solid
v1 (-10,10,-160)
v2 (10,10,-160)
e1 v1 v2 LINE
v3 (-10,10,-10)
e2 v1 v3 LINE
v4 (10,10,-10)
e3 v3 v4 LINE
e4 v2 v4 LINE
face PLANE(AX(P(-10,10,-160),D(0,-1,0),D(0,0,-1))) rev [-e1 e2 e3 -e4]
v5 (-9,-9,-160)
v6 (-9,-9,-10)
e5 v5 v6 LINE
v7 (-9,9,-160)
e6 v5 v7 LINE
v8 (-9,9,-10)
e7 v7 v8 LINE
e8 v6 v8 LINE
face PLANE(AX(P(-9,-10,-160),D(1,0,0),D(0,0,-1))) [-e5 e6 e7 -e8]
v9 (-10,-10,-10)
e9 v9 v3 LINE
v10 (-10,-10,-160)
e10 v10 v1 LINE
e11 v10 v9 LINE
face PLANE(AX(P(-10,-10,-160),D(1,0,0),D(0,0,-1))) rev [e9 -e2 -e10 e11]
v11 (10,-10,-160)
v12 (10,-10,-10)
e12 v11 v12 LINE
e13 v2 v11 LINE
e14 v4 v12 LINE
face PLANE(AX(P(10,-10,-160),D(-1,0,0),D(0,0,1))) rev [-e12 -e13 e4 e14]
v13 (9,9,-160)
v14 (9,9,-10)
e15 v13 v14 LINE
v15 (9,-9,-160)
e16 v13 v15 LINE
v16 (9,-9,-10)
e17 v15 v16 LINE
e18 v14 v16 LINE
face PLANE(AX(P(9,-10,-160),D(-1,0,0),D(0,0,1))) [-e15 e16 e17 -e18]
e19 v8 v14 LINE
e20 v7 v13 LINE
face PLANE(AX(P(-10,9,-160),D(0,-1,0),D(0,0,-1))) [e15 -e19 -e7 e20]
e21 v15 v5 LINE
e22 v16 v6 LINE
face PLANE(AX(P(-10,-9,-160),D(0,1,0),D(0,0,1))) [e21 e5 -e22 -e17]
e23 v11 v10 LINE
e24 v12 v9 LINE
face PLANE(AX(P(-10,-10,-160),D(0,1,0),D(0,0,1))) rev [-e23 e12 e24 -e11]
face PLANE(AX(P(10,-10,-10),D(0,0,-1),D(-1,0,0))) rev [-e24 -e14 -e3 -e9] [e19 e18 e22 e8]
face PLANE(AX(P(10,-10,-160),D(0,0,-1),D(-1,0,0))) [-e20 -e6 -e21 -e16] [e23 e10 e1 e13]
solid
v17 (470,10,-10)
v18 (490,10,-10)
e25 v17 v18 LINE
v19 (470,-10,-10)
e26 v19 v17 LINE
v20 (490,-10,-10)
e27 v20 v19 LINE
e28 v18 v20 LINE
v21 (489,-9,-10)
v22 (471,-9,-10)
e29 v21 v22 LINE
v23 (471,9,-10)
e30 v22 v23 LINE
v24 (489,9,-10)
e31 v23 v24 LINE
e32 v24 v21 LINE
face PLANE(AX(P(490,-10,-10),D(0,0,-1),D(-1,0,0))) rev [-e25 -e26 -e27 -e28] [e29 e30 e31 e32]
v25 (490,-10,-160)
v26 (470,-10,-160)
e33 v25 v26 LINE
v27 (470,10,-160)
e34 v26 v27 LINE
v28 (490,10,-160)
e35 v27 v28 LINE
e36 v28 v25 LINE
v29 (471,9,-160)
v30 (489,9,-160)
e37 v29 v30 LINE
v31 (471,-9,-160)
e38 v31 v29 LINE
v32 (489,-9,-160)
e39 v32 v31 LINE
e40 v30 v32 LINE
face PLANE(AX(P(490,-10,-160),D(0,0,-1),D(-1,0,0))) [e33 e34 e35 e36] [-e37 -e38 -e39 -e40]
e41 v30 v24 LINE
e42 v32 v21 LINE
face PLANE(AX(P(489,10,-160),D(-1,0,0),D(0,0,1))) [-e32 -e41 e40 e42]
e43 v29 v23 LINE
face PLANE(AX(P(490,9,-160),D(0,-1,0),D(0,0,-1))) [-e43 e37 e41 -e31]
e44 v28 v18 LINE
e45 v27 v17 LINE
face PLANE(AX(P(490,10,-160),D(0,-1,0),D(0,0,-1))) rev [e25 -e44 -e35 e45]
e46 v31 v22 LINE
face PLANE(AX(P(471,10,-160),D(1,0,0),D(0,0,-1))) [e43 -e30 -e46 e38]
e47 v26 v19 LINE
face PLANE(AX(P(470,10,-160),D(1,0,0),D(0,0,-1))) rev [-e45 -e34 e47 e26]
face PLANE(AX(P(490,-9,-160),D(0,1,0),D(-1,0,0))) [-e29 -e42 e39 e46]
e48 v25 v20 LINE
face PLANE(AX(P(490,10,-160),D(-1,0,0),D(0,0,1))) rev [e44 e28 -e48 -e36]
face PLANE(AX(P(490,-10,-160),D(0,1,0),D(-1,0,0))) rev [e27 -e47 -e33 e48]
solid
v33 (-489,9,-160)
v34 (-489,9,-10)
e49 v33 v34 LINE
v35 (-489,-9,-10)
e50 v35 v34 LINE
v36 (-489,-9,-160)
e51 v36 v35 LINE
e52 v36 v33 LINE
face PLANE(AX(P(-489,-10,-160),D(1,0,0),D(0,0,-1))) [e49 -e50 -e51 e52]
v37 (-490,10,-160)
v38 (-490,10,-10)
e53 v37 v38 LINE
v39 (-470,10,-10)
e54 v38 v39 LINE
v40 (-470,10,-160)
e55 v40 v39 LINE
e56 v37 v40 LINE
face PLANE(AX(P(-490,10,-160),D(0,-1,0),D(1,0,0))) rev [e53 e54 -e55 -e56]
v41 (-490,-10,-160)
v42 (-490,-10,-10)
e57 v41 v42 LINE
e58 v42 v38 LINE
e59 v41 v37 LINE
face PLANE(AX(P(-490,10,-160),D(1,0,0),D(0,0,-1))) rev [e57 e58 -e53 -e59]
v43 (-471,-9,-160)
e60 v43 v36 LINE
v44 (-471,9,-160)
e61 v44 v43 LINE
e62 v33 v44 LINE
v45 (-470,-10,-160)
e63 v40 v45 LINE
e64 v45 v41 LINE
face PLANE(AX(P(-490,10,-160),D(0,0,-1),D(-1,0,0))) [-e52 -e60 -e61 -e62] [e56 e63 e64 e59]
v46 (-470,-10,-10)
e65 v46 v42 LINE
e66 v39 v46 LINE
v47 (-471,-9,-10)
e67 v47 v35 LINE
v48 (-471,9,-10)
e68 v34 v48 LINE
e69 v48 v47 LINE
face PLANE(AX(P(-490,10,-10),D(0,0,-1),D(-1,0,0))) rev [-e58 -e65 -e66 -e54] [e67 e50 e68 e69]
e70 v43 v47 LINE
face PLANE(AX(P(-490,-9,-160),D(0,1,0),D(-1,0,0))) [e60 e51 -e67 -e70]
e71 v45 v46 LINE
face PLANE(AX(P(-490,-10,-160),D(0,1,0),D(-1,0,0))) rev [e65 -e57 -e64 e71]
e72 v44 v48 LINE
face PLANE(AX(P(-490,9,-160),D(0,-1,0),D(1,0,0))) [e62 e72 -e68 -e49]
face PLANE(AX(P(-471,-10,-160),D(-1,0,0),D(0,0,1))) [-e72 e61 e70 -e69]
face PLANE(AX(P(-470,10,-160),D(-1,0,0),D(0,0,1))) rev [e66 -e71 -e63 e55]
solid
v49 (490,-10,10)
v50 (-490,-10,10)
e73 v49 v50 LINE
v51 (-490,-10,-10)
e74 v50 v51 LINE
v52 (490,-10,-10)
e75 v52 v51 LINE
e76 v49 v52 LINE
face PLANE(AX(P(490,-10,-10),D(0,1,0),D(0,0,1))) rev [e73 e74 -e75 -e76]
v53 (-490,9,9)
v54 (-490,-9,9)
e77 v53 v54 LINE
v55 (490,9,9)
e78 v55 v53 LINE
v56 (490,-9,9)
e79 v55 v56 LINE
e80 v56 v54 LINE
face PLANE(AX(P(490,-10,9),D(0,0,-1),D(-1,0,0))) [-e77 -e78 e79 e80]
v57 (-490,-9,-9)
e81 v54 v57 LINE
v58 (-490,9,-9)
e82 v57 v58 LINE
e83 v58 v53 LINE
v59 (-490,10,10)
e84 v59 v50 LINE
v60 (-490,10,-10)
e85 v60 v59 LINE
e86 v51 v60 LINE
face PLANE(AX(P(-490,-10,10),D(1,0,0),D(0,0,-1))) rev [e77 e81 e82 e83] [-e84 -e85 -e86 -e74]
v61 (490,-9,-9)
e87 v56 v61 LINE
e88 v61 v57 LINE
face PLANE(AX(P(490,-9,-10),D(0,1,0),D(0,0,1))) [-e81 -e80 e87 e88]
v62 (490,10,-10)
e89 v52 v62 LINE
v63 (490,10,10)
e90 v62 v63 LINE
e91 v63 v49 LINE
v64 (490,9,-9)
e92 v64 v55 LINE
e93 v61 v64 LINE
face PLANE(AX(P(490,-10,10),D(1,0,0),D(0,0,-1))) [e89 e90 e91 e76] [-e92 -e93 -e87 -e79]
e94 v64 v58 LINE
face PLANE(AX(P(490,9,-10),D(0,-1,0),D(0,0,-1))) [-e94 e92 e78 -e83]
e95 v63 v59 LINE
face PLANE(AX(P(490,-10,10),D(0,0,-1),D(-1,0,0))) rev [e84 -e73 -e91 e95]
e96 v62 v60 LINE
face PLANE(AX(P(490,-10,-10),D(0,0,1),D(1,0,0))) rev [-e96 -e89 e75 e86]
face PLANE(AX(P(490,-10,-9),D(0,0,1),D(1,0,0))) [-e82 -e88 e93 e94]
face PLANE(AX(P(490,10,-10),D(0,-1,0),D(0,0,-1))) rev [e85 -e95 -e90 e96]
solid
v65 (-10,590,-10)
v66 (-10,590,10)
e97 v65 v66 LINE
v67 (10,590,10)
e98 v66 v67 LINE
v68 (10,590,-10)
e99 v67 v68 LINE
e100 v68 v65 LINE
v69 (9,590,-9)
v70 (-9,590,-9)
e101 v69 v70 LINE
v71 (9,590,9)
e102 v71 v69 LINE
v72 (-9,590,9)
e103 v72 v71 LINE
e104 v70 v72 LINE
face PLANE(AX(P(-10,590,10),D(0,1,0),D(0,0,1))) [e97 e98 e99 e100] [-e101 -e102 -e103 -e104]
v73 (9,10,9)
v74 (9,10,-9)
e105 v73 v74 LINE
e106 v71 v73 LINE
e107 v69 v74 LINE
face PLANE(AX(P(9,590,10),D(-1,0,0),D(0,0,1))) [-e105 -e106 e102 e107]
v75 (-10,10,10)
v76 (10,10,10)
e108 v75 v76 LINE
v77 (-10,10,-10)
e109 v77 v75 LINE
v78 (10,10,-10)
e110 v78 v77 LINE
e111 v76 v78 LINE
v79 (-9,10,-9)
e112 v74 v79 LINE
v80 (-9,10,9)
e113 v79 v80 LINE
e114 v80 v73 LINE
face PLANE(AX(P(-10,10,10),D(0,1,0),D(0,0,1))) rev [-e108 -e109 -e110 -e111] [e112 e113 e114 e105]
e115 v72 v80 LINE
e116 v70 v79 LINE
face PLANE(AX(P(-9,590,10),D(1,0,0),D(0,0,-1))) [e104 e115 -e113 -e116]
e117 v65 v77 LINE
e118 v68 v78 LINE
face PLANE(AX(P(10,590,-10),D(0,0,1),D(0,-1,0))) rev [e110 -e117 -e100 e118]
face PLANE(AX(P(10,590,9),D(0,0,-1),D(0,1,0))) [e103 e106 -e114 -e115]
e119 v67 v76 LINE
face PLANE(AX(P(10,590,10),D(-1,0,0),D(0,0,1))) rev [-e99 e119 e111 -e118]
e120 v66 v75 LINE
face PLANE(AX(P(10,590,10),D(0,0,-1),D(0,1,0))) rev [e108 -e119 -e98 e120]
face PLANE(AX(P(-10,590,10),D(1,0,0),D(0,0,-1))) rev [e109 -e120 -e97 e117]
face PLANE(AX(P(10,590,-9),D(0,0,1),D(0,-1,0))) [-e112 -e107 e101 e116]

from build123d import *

# Parameters (mm, degrees)
CROQUIS1_W              = 20
CROQUIS1_H              = 20
CROQUIS1_W_2            = 18
CROQUIS1_H_2            = 18
EXTRUIR_L_MINA1_DEPTH   = 490
CROQUIS2_W              = 20
CROQUIS2_H              = 20
CROQUIS2_W_2            = 18
CROQUIS2_H_2            = 18
EXTRUIR_L_MINA3_DEPTH   = 150
CROQUIS3_W              = 20
CROQUIS3_H              = 20
CROQUIS3_W_2            = 18
CROQUIS3_H_2            = 18
EXTRUIR_L_MINA5_DEPTH   = 150
EXTRUIR_L_MINA5_2_DEPTH = 150
CROQUIS4_W              = 20
CROQUIS4_H              = 20
CROQUIS4_W_2            = 18
CROQUIS4_H_2            = 18
EXTRUIR_L_MINA6_DEPTH   = 580


with BuildPart() as part:
    # Croquis1 → Extruir-Lámina1 (new, symmetric)
    with BuildSketch(Plane(origin=(0, 0, 0), x_dir=(0, 0, -1), z_dir=(1, 0, 0))):
        Rectangle(CROQUIS1_W, CROQUIS1_H)
        Rectangle(CROQUIS1_W_2, CROQUIS1_H_2, mode=Mode.SUBTRACT)
    extrude(amount=EXTRUIR_L_MINA1_DEPTH, both=True)


with BuildPart() as body_2:
    # Croquis2 → Extruir-Lámina3 (new body)
    with BuildSketch(Plane(origin=(0, 0, -10), x_dir=(-1, 0, 0), z_dir=(0, 0, -1))):
        Rectangle(CROQUIS2_W, CROQUIS2_H)
        Rectangle(CROQUIS2_W_2, CROQUIS2_H_2, mode=Mode.SUBTRACT)
    extrude(amount=EXTRUIR_L_MINA3_DEPTH)


with BuildPart() as body_3:
    # Croquis3 → Extruir-Lámina5 (new body)
    with BuildSketch(Plane(origin=(0, 0, -10), x_dir=(-1, 0, 0), z_dir=(0, 0, -1))):
        with Locations((-480, 0)):
            Rectangle(CROQUIS3_W, CROQUIS3_H)
        with Locations((-480, 0)):
            Rectangle(CROQUIS3_W_2, CROQUIS3_H_2, mode=Mode.SUBTRACT)
    extrude(amount=EXTRUIR_L_MINA5_DEPTH)


with BuildPart() as body_4:
    # Croquis3 → Extruir-L_mina5 2 (new body)
    with BuildSketch(Plane(origin=(0, 0, -10), x_dir=(-1, 0, 0), z_dir=(0, 0, -1))):
        with Locations((480, 0)):
            Rectangle(CROQUIS3_W, CROQUIS3_H)
        with Locations((480, 0)):
            Rectangle(CROQUIS3_W_2, CROQUIS3_H_2, mode=Mode.SUBTRACT)
    extrude(amount=EXTRUIR_L_MINA5_2_DEPTH)


with BuildPart() as body_5:
    # Croquis4 → Extruir-Lámina6 (new body)
    with BuildSketch(Plane(origin=(0, 10, 0), x_dir=(1, 0, 0), z_dir=(0, 1, 0))):
        Rectangle(CROQUIS4_W, CROQUIS4_H)
        Rectangle(CROQUIS4_W_2, CROQUIS4_H_2, mode=Mode.SUBTRACT)
    extrude(amount=EXTRUIR_L_MINA6_DEPTH)


solid = Compound([part.part, body_2.part, body_3.part, body_4.part, body_5.part])
